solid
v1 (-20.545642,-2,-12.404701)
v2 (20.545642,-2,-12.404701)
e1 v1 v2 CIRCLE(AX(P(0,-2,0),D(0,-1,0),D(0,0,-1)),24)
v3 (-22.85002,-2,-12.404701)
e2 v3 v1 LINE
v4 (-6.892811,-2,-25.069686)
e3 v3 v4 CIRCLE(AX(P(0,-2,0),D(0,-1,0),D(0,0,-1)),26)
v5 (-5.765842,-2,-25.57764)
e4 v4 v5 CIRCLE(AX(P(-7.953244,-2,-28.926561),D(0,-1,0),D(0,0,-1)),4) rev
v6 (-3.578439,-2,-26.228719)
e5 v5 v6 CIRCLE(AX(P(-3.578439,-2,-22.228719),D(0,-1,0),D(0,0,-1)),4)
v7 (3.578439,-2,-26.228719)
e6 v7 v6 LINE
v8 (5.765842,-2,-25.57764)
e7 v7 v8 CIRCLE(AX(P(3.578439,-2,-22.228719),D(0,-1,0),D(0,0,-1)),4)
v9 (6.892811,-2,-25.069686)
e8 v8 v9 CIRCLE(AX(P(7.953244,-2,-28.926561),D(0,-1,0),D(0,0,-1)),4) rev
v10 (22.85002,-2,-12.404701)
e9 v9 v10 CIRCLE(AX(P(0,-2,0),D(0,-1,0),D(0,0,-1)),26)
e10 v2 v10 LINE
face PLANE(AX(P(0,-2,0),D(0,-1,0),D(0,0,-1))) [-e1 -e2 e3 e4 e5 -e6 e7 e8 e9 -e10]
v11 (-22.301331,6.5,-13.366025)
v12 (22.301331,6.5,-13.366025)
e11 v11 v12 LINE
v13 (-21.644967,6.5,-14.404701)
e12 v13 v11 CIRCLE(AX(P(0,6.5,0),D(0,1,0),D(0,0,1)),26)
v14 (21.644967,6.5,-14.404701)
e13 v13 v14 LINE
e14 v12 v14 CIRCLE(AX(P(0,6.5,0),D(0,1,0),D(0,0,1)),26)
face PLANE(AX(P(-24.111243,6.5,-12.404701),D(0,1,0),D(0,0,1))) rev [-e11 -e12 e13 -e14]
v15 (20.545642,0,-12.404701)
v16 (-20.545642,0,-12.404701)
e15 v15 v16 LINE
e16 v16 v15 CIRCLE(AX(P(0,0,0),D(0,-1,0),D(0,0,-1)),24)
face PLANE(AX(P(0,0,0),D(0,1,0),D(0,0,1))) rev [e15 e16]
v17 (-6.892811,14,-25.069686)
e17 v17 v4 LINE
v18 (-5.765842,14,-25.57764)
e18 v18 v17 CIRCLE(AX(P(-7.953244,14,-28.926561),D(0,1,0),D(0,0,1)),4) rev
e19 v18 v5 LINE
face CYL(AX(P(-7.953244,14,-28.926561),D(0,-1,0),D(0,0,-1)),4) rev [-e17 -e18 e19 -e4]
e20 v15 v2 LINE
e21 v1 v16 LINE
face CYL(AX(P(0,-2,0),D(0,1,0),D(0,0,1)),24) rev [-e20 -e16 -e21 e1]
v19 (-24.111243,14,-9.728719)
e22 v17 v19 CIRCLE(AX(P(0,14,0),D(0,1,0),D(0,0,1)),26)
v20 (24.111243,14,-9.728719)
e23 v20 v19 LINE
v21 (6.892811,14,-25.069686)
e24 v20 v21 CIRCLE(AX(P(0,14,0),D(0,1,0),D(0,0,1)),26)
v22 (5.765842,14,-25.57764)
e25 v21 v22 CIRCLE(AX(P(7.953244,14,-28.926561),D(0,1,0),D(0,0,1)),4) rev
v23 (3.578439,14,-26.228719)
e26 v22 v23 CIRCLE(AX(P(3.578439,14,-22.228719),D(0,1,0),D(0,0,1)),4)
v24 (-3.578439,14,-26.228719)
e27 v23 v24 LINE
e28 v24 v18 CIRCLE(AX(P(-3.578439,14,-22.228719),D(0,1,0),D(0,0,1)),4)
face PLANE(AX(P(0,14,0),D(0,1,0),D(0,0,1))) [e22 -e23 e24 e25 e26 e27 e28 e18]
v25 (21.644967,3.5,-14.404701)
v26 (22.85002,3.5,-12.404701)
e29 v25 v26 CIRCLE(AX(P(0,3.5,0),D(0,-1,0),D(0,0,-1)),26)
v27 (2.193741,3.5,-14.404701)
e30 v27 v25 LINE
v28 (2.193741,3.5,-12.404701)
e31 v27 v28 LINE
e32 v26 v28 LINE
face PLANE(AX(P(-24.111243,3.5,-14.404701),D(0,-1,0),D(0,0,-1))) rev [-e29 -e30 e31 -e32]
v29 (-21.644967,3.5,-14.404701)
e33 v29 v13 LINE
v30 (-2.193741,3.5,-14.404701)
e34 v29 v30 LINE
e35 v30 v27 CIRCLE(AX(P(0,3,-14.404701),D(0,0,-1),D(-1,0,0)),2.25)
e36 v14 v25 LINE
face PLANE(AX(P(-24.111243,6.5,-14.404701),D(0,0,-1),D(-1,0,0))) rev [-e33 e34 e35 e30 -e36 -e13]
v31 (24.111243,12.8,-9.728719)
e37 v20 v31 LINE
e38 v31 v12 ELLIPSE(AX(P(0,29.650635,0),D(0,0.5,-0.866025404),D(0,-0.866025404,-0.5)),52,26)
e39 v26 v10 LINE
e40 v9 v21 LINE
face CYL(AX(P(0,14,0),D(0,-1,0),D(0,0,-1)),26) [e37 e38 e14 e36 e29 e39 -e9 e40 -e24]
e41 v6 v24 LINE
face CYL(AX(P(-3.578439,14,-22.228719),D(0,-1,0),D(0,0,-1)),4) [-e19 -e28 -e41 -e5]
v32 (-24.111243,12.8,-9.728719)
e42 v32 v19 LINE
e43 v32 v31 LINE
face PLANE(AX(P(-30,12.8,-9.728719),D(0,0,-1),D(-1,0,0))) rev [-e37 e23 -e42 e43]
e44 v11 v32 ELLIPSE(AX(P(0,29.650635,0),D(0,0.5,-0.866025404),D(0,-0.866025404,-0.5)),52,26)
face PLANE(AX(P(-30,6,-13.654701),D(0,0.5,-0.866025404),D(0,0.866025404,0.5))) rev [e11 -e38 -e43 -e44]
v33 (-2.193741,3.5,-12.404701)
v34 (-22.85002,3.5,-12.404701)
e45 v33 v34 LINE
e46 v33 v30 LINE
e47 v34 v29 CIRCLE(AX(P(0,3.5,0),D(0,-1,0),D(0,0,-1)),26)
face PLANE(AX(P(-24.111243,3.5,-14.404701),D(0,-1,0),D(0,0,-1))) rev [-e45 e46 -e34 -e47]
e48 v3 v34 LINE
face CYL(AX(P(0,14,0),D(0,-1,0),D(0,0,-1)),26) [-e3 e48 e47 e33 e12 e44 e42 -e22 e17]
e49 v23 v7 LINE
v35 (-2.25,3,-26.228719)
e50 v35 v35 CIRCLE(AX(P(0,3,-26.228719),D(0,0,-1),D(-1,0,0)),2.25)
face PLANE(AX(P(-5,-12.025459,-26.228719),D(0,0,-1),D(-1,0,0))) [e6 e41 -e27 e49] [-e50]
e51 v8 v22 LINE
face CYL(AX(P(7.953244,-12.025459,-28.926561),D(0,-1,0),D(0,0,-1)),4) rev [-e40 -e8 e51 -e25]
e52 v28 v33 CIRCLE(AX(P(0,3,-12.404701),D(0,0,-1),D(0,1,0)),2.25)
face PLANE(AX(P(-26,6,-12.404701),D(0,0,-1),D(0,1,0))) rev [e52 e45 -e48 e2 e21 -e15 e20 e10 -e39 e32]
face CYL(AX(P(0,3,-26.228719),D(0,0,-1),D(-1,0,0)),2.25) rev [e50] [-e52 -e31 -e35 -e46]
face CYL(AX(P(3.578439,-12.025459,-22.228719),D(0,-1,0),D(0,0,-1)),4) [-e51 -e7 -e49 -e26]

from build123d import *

# Parameters (mm, degrees)
SKETCH_1_R                  = 26
EXTRUDE_1_DEPTH             = 14
CUT_EXTRUDE_1_DEPTH         = 30
HOLE_WIZARD_M32_D           = 3.4
HOLE_WIZARD_M32_CBORE_D     = 6.6
HOLE_WIZARD_M32_CBORE_DEPTH = 3
EXTRUDE_START               = 2
SKETCH_12_R                 = 26
SKETCH_12_R_2               = 24
EXTRUDE_2_DEPTH             = 2
CUT_EXTRUDE_START           = -8
CUT_EXTRUDE_4_DEPTH         = 8
FILLET_2_R                  = 1
SKETCH_18_R                 = 6
CUT_EXTRUDE_5_DEPTH         = 3
CUT_EXTRUDE_START_2         = -10
CUT_EXTRUDE_6_DEPTH         = 10
M4X0_71_D                   = 3.3
M4X0_71_DEPTH               = 11.5
M4X0_71_TIP                 = 0.991420021
SKETCH_20_W                 = 50.531548996
SKETCH_20_H                 = 7
CUT_EXTRUDE_7_DEPTH         = 2
SKETCH_24_W                 = 22.63069338
SKETCH_24_H                 = 1
EXTRUDE_3_DEPTH             = 2
SKETCH_25_W                 = 27.749072331
SKETCH_25_H                 = 11.312162615
CUT_EXTRUDE_8_DEPTH         = 60.799665638
SKETCH_26_W                 = 2
SKETCH_26_H                 = 3
CUT_EXTRUDE_10_DEPTH        = 59.164737265
EXTRUDE_START_2             = -16
EXTRUDE_5_DEPTH             = 16
FILLET_3_R                  = 4
FILLET_4_R                  = 4
HOLE_WIZARD_M41_D           = 4.5


with BuildPart() as part:
    # Эскиз1 → Бобышка-Вытянуть1 (new body)
    with BuildSketch(Plane(origin=(0, 0, 0), x_dir=(1, 0, 0), z_dir=(0, 1, 0))):
        with Locations(Location((0, 0, 0), (0, 0, 270))):
            Circle(SKETCH_1_R)
    extrude(amount=EXTRUDE_1_DEPTH)

    # Эскиз2 → Вырез-Вытянуть1 (cut, symmetric)
    with BuildSketch(Plane(origin=(0, 0, 0), x_dir=(0, 0, -1), z_dir=(1, 0, 0))):
        Polygon((13.654700538, 6), (-13.654700538, 6), (-9.728718708, 12.8), (-9.728718708, 14), (9.728718708, 14), (9.728718708, 12.8), align=None)
    extrude(amount=CUT_EXTRUDE_1_DEPTH, both=True, mode=Mode.SUBTRACT)

    # Цековка для винта с внутренним шестигранником M32 (through all)
    with Locations(Plane(origin=(0, 6, 0), x_dir=(1, 0, 0), z_dir=(0, 1, 0))):
        with Locations((-12.5, 0), (12.5, 0), (-6, 0), (6, 0)):
            CounterBoreHole(HOLE_WIZARD_M32_D / 2, HOLE_WIZARD_M32_CBORE_D / 2, HOLE_WIZARD_M32_CBORE_DEPTH)

    # Эскиз12 → Бобышка-Вытянуть2 (add)
    with BuildSketch(Plane.XZ.offset(EXTRUDE_START)):
        with Locations(Location((0, 0, 0), (0, 0, 270))):
            Circle(SKETCH_12_R)
        with Locations(Location((0, 0, 0), (0, 0, 270))):
            Circle(SKETCH_12_R_2, mode=Mode.SUBTRACT)
    extrude(amount=-EXTRUDE_2_DEPTH)

    # Эскиз17 → Вырез-Вытянуть4 (cut)
    with BuildSketch(Plane(origin=(0, 14, 0), x_dir=(1, 0, 0), z_dir=(0, 1, 0)).offset(CUT_EXTRUDE_START)):
        with BuildLine():
            Line((-24.111242861, -9.728718708), (24.111242861, -9.728718708))
            ThreePointArc((24.111242861, -9.728718708), (0, -26), (-24.111242861, -9.728718708))
        make_face()
    extrude(amount=CUT_EXTRUDE_4_DEPTH, mode=Mode.SUBTRACT)

    # Скругление2
    fillet_2_edges = [part.edges().sort_by_distance(p)[0] for p in [
        (9.25, 4.5, -0.572276157),
        (9.25, 4.5, 0.572276157),
        (-9.25, 4.5, 0.572276157),
        (-9.25, 4.5, -0.572276157),
    ]]
    fillet(fillet_2_edges, radius=FILLET_2_R)

    # Эскиз18 → Вырез-Вытянуть5 (cut)
    with BuildSketch(Plane.XZ):
        Circle(SKETCH_18_R)
    extrude(amount=-CUT_EXTRUDE_5_DEPTH, mode=Mode.SUBTRACT)

    # Эскиз19 → Вырез-Вытянуть6 (cut)
    with BuildSketch(Plane(origin=(0, 6, 0), x_dir=(1, 0, 0), z_dir=(0, 1, 0)).offset(CUT_EXTRUDE_START_2)):
        with BuildLine():
            Line((-22.313739765, -13.345299462), (22.313739765, -13.345299462))
            ThreePointArc((22.313739765, -13.345299462), (0, -26), (-22.313739765, -13.345299462))
        make_face()
    extrude(amount=CUT_EXTRUDE_6_DEPTH, mode=Mode.SUBTRACT)

    # Отверстие обработанное метчиком M4x0.71
    with Locations(Plane.XY.offset(13.345299462)):
        with Locations((0, 3)):
            Hole(M4X0_71_D / 2, depth=M4X0_71_DEPTH)
            with Locations((0, 0, -(M4X0_71_DEPTH + M4X0_71_TIP / 2))):  # 118° drill point
                Cone(0, M4X0_71_D / 2, M4X0_71_TIP, mode=Mode.SUBTRACT)

    # Эскиз20 → Вырез-Вытянуть7 (cut)
    with BuildSketch(Plane.XY.offset(13.345299462)):
        with Locations((0, 1.5)):
            Rectangle(SKETCH_20_W, SKETCH_20_H)
    extrude(amount=-CUT_EXTRUDE_7_DEPTH, mode=Mode.SUBTRACT)

    # Эскиз24 → Бобышка-Вытянуть3 (add)
    with BuildSketch(Plane.XY.offset(11.345299462)):
        with Locations((0, 0.5)):
            Rectangle(SKETCH_24_W, SKETCH_24_H)
    extrude(amount=EXTRUDE_3_DEPTH)

    # Эскиз25 → Вырез-Вытянуть8 (cut, through all)
    with BuildSketch(Plane(origin=(26, 0, 0), x_dir=(0, 0, -1), z_dir=(1, 0, 0))):
        with Locations((-1.469835628, 0.343918692)):
            Rectangle(SKETCH_25_W, SKETCH_25_H)
    extrude(amount=-CUT_EXTRUDE_8_DEPTH, mode=Mode.SUBTRACT)

    # Эскиз26 → Вырез-Вытянуть10 (cut, through all)
    with BuildSketch(Plane(origin=(26, 0, 0), x_dir=(0, 0, -1), z_dir=(1, 0, 0))):
        with Locations((13.404700538, 5)):
            Rectangle(SKETCH_26_W, SKETCH_26_H)
    extrude(amount=-CUT_EXTRUDE_10_DEPTH, mode=Mode.SUBTRACT)

    # Эскиз27 → Бобышка-Вытянуть5 (add)
    with BuildSketch(Plane(origin=(0, 14, 0), x_dir=(1, 0, 0), z_dir=(0, 1, 0)).offset(EXTRUDE_START_2)):
        with BuildLine():
            Line((-5, 26.228718708), (5, 26.228718708))
            Line((5, 26.228718708), (5, 25.514701644))
            ThreePointArc((5, 25.514701644), (0, 26), (-5, 25.514701644))
            Line((-5, 25.514701644), (-5, 26.228718708))
        make_face()
    extrude(amount=EXTRUDE_5_DEPTH)

    # Скругление3
    # the kernel refuses this fillet: 4 mm, written as the material it adds along each edge
    with BuildSketch(Plane(origin=(5, -2, -25.514701644), x_dir=(0.9734574738252592, 0, 0.22886796773193235), z_dir=(0, 1, 0))) as fillet_3_piece_1:
        with BuildLine():
            CenterArc((2.09399194, 3.997202592), FILLET_3_R, 235.642702264, 32.214353504)
            Line((-0.163415634, 0.695065247), (-0.208563786, 0.6290225))
            ThreePointArc((-0.208563786, 0.6290225), (-0.159584415, 0.329223186), (-0.077876598, -0.018309437))
            Line((-0.077876598, -0.018309437), (0.002991417, -0.079944052))
            ThreePointArc((0.002991417, -0.079944052), (0.972210544, -0.061816847), (1.94142967, -0.079944052))
            Line((1.94142967, -0.079944052), (1.944421087, 0))
        make_face()
    extrude(amount=16)
    with BuildSketch(Plane(origin=(-5, -2, -25.514701644), x_dir=(-0.9734574738252595, 0, 0.2288679677319309), z_dir=(0, 1, 0))) as fillet_3_piece_2:
        with BuildLine():
            CenterArc((2.09399194, -3.997202592), FILLET_3_R, 92.142944232, 32.214353504)
            Line((-0.163415634, -0.695065247), (-0.208563786, -0.6290225))
            ThreePointArc((-0.208563786, -0.6290225), (-0.159584415, -0.329223186), (-0.077876598, 0.018309437))
            Line((-0.077876598, 0.018309437), (0.002991417, 0.079944052))
            ThreePointArc((0.002991417, 0.079944052), (0.972210544, 0.061816847), (1.94142967, 0.079944052))
            Line((1.94142967, 0.079944052), (1.944421087, 0))
        make_face()
    extrude(amount=16)

    # Скругление4
    fillet_4_edges = [part.edges().sort_by_distance(p)[0] for p in [
        (5, 6, -26.228718708),
        (-5, 6, -26.228718708),
    ]]
    fillet(fillet_4_edges, radius=FILLET_4_R)

    # Отверстие с зазором M41 (through all)
    with Locations(Plane(origin=(0, 0, -26.228718708), x_dir=(-1, 0, 0), z_dir=(0, 0, -1))):
        with Locations((0, 3)):
            Hole(HOLE_WIZARD_M41_D / 2)


solid = part.part
